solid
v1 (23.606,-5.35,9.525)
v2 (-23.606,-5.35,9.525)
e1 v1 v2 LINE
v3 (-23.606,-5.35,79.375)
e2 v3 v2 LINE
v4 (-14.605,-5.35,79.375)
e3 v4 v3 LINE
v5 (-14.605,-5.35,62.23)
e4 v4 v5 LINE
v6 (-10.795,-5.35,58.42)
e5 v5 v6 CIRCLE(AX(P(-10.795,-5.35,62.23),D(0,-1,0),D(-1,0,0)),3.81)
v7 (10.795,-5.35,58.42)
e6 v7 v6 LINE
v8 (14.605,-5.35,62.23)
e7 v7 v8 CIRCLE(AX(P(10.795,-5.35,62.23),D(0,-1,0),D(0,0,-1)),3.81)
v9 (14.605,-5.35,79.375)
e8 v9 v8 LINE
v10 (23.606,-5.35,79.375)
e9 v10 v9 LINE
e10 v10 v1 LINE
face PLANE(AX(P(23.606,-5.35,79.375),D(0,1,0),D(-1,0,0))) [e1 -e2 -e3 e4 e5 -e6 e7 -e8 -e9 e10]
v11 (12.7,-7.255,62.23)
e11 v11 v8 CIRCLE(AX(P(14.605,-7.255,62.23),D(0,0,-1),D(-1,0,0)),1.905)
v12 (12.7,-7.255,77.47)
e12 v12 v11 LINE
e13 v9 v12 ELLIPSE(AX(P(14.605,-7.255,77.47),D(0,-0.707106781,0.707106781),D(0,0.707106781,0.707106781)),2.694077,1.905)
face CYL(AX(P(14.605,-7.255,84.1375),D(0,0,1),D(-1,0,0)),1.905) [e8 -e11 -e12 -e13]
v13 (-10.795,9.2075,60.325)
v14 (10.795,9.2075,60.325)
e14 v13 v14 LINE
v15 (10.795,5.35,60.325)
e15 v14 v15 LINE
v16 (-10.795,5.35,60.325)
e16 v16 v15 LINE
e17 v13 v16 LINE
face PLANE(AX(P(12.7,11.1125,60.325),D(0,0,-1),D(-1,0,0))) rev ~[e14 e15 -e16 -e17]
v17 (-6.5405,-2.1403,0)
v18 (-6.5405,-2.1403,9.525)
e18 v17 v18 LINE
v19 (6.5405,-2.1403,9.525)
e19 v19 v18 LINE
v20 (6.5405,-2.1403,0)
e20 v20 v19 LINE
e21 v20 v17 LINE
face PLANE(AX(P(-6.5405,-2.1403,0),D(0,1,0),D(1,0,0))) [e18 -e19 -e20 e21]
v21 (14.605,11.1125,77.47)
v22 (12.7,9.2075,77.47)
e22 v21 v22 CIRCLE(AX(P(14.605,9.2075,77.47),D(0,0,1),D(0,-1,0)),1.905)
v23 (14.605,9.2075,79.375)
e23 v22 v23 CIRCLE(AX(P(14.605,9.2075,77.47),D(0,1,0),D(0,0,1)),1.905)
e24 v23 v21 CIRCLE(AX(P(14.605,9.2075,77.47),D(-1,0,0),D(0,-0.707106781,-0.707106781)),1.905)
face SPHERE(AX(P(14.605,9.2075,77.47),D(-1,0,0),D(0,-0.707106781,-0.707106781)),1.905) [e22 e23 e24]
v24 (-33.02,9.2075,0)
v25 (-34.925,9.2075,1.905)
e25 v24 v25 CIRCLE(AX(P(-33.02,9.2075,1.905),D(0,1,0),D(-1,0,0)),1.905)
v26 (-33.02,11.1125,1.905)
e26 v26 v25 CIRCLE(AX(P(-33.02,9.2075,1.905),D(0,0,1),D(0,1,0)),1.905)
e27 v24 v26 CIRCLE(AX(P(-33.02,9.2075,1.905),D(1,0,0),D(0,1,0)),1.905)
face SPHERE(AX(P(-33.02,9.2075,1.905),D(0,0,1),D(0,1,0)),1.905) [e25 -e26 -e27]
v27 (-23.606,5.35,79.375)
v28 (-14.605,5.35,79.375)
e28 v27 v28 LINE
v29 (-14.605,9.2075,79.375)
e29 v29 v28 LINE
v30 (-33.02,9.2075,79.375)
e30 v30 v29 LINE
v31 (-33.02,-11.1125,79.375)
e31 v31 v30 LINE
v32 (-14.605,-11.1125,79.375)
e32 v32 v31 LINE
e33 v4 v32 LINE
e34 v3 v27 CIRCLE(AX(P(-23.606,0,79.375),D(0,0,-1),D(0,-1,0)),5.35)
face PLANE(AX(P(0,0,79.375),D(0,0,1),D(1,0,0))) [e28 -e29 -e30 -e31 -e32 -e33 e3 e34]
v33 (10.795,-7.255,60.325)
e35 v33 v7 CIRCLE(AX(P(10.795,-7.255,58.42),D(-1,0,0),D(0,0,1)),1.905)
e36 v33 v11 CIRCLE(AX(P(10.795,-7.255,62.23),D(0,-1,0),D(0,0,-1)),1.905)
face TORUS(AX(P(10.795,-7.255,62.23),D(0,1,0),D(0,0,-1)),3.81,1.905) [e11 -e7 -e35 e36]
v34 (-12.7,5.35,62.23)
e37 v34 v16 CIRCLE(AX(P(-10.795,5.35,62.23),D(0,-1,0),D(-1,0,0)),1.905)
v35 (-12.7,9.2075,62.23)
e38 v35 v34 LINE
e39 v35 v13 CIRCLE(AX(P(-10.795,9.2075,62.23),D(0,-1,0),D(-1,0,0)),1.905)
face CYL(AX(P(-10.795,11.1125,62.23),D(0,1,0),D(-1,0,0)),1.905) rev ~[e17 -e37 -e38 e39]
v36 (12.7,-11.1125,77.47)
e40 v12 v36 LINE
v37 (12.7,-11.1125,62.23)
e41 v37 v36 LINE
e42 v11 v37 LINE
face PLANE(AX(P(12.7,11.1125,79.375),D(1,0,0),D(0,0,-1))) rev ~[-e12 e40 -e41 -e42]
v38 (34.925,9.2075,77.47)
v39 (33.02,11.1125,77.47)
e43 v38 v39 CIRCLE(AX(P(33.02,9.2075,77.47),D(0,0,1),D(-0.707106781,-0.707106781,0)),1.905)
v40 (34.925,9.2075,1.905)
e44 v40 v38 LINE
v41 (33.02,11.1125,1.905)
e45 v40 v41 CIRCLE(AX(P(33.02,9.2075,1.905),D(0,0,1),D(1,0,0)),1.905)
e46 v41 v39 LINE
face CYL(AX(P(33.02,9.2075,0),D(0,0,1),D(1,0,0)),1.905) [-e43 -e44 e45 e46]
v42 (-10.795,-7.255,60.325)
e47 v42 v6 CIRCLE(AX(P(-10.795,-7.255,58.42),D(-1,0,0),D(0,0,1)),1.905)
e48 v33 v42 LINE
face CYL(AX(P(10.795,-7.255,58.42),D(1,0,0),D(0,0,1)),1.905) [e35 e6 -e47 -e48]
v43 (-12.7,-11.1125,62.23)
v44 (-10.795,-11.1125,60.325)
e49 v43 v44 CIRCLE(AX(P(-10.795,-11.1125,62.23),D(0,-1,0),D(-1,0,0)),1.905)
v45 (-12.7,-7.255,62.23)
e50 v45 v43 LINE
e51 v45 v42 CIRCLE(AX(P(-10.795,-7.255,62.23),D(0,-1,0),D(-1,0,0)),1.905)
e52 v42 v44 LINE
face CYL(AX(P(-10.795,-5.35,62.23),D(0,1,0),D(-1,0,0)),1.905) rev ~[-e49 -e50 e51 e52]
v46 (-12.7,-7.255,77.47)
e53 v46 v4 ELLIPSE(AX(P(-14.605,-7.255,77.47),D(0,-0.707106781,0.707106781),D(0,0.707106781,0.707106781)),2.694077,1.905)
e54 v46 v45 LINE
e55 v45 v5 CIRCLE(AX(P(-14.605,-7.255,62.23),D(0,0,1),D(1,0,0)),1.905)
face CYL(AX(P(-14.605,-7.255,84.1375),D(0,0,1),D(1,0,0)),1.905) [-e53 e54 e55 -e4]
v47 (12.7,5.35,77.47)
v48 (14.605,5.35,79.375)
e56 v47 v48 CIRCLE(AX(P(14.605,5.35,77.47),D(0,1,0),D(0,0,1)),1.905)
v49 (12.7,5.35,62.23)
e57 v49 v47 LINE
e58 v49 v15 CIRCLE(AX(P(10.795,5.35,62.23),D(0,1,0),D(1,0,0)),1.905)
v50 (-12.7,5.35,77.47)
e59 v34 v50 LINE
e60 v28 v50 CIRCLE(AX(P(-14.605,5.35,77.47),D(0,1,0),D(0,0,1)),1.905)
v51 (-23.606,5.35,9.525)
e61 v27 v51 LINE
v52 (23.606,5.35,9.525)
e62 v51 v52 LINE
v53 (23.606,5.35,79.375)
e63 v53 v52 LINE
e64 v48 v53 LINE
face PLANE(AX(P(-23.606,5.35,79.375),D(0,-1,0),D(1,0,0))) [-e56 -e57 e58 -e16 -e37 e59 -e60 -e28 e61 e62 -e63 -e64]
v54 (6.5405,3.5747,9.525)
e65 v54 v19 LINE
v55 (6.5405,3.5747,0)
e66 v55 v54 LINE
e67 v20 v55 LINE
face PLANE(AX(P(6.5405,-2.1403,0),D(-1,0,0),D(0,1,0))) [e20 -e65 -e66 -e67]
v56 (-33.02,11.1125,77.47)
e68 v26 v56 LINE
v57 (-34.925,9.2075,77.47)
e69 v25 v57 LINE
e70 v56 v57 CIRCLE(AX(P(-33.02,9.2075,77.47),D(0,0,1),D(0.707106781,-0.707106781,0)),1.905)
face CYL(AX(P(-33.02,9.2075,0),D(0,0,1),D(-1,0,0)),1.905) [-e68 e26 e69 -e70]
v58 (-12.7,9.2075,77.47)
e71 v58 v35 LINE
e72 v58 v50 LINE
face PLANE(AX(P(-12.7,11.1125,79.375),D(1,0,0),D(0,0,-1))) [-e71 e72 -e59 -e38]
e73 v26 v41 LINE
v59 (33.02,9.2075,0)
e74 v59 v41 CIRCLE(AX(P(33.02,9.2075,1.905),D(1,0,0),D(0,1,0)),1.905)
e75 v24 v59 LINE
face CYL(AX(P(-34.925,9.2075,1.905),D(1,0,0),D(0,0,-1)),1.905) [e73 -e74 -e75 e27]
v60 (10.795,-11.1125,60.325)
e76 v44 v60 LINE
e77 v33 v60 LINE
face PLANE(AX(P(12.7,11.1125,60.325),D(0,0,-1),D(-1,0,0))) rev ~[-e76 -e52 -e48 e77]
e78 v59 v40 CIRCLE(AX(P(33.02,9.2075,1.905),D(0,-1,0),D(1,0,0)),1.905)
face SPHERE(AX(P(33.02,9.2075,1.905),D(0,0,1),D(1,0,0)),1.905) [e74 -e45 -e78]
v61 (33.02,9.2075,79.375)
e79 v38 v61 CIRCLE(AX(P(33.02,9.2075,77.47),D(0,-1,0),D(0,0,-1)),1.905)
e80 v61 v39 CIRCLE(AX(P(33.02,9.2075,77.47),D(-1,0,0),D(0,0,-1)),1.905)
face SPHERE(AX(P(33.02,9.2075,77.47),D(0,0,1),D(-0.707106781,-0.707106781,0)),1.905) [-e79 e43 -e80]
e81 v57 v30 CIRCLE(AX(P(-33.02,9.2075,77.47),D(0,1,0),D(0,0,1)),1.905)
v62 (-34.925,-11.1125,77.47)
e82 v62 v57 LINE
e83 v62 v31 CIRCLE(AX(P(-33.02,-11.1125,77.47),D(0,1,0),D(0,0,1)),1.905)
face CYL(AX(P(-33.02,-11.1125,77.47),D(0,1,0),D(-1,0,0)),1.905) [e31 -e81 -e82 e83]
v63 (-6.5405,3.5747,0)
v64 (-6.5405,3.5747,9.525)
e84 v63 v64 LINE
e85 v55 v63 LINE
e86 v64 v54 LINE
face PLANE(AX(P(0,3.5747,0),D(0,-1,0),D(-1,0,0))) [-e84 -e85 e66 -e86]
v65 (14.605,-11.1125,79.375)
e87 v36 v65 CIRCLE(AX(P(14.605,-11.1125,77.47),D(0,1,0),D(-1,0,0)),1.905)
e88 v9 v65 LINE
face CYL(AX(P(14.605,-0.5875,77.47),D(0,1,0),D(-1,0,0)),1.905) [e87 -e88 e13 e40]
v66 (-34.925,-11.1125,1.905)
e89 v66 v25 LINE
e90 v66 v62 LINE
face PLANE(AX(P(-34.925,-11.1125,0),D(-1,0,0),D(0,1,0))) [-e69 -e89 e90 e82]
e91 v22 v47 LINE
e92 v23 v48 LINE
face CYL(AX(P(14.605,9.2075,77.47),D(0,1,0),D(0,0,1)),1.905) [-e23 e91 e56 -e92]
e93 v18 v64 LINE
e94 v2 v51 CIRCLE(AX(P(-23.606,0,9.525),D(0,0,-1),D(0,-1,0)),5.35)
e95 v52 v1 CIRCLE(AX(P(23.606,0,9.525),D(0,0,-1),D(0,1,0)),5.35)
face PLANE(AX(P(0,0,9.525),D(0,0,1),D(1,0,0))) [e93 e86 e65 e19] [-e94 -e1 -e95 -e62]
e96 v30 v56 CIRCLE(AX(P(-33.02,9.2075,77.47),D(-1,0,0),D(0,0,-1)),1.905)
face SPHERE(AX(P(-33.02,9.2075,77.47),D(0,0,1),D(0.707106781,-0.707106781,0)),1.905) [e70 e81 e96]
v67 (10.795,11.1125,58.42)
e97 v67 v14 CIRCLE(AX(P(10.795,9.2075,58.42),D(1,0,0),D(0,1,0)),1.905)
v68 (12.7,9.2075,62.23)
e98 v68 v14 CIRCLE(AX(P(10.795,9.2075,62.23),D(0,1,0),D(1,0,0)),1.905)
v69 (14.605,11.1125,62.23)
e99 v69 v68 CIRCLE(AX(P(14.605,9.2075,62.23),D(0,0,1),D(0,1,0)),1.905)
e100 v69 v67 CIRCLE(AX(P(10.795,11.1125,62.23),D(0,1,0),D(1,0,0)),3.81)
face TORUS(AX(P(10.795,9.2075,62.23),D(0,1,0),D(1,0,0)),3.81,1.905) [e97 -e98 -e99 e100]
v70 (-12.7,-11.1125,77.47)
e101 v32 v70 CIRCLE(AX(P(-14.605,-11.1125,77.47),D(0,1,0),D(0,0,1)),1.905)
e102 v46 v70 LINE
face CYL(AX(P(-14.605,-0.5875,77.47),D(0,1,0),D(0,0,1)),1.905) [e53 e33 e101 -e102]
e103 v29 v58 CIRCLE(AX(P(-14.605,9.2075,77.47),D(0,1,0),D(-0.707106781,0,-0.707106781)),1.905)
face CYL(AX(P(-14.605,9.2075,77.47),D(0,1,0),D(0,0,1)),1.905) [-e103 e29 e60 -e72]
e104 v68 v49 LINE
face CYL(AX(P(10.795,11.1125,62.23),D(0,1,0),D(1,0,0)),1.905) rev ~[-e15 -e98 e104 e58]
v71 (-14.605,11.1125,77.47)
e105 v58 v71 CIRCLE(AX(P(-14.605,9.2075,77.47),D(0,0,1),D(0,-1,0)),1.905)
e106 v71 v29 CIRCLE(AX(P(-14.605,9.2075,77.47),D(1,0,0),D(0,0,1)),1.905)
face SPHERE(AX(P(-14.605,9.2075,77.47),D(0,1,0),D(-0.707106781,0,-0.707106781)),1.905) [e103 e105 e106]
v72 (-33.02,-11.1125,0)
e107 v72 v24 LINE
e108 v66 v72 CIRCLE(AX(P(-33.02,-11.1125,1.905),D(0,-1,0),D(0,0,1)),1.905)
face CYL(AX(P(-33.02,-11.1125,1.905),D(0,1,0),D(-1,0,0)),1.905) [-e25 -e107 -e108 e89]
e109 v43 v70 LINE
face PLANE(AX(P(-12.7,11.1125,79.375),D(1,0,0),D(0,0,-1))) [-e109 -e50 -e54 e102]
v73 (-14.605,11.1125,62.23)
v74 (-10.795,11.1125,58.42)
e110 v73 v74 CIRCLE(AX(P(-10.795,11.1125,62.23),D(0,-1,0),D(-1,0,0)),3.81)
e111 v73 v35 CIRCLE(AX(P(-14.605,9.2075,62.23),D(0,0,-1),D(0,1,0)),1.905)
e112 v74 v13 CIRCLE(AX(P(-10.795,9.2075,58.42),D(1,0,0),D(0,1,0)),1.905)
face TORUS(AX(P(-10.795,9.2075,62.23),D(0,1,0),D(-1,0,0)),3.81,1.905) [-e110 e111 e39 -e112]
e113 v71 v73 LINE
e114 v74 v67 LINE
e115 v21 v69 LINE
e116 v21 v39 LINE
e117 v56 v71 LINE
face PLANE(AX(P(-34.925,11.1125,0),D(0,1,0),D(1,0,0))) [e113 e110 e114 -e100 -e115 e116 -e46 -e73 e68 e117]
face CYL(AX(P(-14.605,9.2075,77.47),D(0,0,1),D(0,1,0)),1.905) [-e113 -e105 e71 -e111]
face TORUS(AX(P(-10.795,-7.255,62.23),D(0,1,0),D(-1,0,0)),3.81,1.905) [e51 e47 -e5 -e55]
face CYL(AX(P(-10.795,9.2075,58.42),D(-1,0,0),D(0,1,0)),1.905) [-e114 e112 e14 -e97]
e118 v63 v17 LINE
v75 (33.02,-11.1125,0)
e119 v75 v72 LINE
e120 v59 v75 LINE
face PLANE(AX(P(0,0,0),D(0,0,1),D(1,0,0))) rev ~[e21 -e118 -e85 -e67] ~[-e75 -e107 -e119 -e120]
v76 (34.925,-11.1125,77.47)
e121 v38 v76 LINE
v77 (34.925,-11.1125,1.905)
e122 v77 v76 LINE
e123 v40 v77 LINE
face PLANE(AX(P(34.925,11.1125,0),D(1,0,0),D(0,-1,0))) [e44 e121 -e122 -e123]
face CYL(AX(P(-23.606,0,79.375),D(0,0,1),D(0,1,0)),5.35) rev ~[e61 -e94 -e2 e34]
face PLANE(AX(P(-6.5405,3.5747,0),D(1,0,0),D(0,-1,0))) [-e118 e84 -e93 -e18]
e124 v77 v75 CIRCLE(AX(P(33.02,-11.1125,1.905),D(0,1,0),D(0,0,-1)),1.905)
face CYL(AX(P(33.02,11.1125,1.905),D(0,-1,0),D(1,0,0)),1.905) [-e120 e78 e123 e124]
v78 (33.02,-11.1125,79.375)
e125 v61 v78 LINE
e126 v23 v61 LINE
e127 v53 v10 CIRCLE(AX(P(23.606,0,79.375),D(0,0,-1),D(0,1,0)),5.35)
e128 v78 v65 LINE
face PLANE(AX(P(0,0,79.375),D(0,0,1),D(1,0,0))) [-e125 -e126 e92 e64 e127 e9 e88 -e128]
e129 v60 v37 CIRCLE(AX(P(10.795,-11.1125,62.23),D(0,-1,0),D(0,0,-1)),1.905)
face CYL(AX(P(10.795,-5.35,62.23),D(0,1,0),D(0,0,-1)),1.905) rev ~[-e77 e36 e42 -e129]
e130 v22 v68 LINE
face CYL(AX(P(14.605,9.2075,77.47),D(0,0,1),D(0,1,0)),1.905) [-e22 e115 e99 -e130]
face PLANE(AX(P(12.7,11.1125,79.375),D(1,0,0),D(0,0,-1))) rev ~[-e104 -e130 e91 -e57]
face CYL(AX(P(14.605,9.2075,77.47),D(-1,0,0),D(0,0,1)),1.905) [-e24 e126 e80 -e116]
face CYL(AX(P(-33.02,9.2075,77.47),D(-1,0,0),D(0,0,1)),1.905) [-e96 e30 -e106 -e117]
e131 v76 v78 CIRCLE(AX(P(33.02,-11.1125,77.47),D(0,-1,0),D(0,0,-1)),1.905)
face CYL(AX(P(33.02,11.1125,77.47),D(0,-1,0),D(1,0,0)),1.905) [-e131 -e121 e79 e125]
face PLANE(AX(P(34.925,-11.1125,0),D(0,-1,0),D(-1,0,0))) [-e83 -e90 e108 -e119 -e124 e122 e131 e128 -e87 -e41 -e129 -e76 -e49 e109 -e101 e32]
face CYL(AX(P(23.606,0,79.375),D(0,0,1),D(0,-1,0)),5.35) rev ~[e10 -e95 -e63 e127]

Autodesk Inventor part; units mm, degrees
ref_plane "YZ Plane" through (0, 0, 0) normal (1, 0, 0) x (0, 1, 0)
ref_plane "XZ Plane" through (0, 0, 0) normal (0, 1, 0) x (-1, 0, 0)
ref_plane "XY Plane" through (0, 0, 0) normal (0, 0, 1) x (1, 0, 0)
sketch "Sketch1" plane through (0, 0, 0) normal (0, 0, 1) x (1, 0, 0)
  line L0 (34.925, -11.1125) -> (-34.925, -11.1125)
  line L1 (-34.925, -11.1125) -> (-34.925, 11.1125)
  line L2 (-34.925, 11.1125) -> (34.925, 11.1125)
  line L3 (34.925, 11.1125) -> (34.925, -11.1125)
  line L4 (34.925, -11.1125) -> (-34.925, 11.1125) construction
  line L5 (-34.925, -11.1125) -> (34.925, 11.1125) construction
  point P0 (0, 0)
  dimension "d0" = 69.85
  dimension "d1" = 22.225
extrude "Extrusion1" add sketch "Sketch1" along normal blind 79.375
sketch "Sketch2" plane through (0, 0, 79.375) normal (0, 0, 1) x (1, 0, 0)
  line L0 (23.606, -5.35) -> (-23.606, -5.35)
  line L1 (-28.956, 0) -> (-28.956, 0)
  line L2 (-23.606, 5.35) -> (23.606, 5.35)
  line L3 (28.956, 0) -> (28.956, 0)
  line L4 (28.956, -5.35) -> (-28.956, 5.35) construction
  line L5 (-28.956, -5.35) -> (28.956, 5.35) construction
  arc A0 (-23.606, 5.35) -> (-28.956, 0) centre (-23.606, 0) ccw
  arc A1 (-28.956, 0) -> (-23.606, -5.35) centre (-23.606, 0) ccw
  arc A2 (28.956, 0) -> (23.606, 5.35) centre (23.606, 0) ccw
  arc A3 (23.606, -5.35) -> (28.956, 0) centre (23.606, 0) ccw
  point P0 (0, 0)
  point P1 (28.956, 0)
  point P2 (-28.956, 0)
  dimension "d5" = 57.912
  dimension "d6" = 10.7
  dimension "d9" = 5.35
extrude "Extrusion2" cut sketch "Sketch2" against normal blind 69.85
fillet "Fillet1" radius 1.905 7 edges at (-34.925, 0, 79.375) (-34.925, 11.1125, 39.6875) (34.925, 0, 79.375) (34.925, 11.1125, 39.6875) (34.925, 0, 0) (0, 11.1125, 0) (-34.925, 0, 0)
sketch "Sketch3" plane through (0, 0, 0) normal (0, 0, -1) x (-1, 0, 0)
  line L0 (-23.606, -5.35) -> (23.606, -5.35) projected
  arc A0 (23.606, -5.35) -> (23.606, 5.35) centre (23.606, 0) ccw projected
  line L1 (23.606, 5.35) -> (-23.606, 5.35) projected
  arc A1 (-23.606, 5.35) -> (-23.606, -5.35) centre (-23.606, 0) ccw projected
  line L2 (6.5405, -2.1403) -> (-6.5405, -2.1403)
  line L3 (-6.5405, -2.1403) -> (-6.5405, 3.5747)
  line L4 (-6.5405, 3.5747) -> (6.5405, 3.5747)
  line L5 (6.5405, 3.5747) -> (6.5405, -2.1403)
  line L6 (6.5405, -2.1403) -> (-6.5405, 3.5747) construction
  line L7 (-6.5405, -2.1403) -> (6.5405, 3.5747) construction
  line L8 (33.02, 9.2075) -> (-33.02, 9.2075) projected
  line L9 (0, 9.2075) -> (0, -11.1125)
  line L10 (33.02, -11.1125) -> (-33.02, -11.1125) projected
  point P0 (0, 0)
  point P1 (0, 0.7172)
  dimension "d10" = 13.081
  dimension "d11" = 5.715
  dimension "d13" = 4.6328
extrude "Extrusion3" cut sketch "Sketch3" against normal through all contours L9 L4 L5 L2 | L2 L3 L4 L9
sketch "Sketch5" plane through (-33.02, 11.1125, 79.375) normal (0, 1, 0) x (1, 0, 0)
  line L0 (33.02, 79.375) -> (33.02, 0)
  line L1 (20.32, 0) -> (20.32, 19.05)
  line L2 (20.32, 19.05) -> (33.02, 19.05)
  line L3 (20.32, 0) -> (33.02, 0)
  line L4 (66.04, 0) -> (0, 0) projected
  line L5 (45.72, 0) -> (45.72, 19.05)
  line L6 (45.72, 19.05) -> (33.02, 19.05)
  line L7 (45.72, 0) -> (33.02, 0)
  point P0 (33.02, 0)
  point P1 (45.72, 0)
  dimension "d22" = 19.05
  dimension "d23" = 12.7
extrude "Extrusion5" cut sketch "Sketch5" against normal through all
fillet "Fillet3" radius 1.905 18 edges at (-34.367, 10.5545, 78.817) (-22.86, 11.1125, 79.375) (-12.7, 11.1125, 69.85) (0, 11.1125, 60.325) (12.7, 11.1125, 69.85) (12.7, 8.2313, 79.375) (0, -5.35, 60.325) (-12.7, -5.35, 69.85) (12.7, -5.35, 69.85) (12.7, -8.2313, 79.375) (-12.7, -8.2313, 79.375) (34.367, 10.5545, 78.817) (22.86, 11.1125, 79.375) (-12.7, 8.2312, 79.375) (-12.7, 8.2312, 60.325) (12.7, -8.2313, 60.325) (12.7, 8.2313, 60.325) (-12.7, -8.2313, 60.325)
properties part number "_3DPrint"
